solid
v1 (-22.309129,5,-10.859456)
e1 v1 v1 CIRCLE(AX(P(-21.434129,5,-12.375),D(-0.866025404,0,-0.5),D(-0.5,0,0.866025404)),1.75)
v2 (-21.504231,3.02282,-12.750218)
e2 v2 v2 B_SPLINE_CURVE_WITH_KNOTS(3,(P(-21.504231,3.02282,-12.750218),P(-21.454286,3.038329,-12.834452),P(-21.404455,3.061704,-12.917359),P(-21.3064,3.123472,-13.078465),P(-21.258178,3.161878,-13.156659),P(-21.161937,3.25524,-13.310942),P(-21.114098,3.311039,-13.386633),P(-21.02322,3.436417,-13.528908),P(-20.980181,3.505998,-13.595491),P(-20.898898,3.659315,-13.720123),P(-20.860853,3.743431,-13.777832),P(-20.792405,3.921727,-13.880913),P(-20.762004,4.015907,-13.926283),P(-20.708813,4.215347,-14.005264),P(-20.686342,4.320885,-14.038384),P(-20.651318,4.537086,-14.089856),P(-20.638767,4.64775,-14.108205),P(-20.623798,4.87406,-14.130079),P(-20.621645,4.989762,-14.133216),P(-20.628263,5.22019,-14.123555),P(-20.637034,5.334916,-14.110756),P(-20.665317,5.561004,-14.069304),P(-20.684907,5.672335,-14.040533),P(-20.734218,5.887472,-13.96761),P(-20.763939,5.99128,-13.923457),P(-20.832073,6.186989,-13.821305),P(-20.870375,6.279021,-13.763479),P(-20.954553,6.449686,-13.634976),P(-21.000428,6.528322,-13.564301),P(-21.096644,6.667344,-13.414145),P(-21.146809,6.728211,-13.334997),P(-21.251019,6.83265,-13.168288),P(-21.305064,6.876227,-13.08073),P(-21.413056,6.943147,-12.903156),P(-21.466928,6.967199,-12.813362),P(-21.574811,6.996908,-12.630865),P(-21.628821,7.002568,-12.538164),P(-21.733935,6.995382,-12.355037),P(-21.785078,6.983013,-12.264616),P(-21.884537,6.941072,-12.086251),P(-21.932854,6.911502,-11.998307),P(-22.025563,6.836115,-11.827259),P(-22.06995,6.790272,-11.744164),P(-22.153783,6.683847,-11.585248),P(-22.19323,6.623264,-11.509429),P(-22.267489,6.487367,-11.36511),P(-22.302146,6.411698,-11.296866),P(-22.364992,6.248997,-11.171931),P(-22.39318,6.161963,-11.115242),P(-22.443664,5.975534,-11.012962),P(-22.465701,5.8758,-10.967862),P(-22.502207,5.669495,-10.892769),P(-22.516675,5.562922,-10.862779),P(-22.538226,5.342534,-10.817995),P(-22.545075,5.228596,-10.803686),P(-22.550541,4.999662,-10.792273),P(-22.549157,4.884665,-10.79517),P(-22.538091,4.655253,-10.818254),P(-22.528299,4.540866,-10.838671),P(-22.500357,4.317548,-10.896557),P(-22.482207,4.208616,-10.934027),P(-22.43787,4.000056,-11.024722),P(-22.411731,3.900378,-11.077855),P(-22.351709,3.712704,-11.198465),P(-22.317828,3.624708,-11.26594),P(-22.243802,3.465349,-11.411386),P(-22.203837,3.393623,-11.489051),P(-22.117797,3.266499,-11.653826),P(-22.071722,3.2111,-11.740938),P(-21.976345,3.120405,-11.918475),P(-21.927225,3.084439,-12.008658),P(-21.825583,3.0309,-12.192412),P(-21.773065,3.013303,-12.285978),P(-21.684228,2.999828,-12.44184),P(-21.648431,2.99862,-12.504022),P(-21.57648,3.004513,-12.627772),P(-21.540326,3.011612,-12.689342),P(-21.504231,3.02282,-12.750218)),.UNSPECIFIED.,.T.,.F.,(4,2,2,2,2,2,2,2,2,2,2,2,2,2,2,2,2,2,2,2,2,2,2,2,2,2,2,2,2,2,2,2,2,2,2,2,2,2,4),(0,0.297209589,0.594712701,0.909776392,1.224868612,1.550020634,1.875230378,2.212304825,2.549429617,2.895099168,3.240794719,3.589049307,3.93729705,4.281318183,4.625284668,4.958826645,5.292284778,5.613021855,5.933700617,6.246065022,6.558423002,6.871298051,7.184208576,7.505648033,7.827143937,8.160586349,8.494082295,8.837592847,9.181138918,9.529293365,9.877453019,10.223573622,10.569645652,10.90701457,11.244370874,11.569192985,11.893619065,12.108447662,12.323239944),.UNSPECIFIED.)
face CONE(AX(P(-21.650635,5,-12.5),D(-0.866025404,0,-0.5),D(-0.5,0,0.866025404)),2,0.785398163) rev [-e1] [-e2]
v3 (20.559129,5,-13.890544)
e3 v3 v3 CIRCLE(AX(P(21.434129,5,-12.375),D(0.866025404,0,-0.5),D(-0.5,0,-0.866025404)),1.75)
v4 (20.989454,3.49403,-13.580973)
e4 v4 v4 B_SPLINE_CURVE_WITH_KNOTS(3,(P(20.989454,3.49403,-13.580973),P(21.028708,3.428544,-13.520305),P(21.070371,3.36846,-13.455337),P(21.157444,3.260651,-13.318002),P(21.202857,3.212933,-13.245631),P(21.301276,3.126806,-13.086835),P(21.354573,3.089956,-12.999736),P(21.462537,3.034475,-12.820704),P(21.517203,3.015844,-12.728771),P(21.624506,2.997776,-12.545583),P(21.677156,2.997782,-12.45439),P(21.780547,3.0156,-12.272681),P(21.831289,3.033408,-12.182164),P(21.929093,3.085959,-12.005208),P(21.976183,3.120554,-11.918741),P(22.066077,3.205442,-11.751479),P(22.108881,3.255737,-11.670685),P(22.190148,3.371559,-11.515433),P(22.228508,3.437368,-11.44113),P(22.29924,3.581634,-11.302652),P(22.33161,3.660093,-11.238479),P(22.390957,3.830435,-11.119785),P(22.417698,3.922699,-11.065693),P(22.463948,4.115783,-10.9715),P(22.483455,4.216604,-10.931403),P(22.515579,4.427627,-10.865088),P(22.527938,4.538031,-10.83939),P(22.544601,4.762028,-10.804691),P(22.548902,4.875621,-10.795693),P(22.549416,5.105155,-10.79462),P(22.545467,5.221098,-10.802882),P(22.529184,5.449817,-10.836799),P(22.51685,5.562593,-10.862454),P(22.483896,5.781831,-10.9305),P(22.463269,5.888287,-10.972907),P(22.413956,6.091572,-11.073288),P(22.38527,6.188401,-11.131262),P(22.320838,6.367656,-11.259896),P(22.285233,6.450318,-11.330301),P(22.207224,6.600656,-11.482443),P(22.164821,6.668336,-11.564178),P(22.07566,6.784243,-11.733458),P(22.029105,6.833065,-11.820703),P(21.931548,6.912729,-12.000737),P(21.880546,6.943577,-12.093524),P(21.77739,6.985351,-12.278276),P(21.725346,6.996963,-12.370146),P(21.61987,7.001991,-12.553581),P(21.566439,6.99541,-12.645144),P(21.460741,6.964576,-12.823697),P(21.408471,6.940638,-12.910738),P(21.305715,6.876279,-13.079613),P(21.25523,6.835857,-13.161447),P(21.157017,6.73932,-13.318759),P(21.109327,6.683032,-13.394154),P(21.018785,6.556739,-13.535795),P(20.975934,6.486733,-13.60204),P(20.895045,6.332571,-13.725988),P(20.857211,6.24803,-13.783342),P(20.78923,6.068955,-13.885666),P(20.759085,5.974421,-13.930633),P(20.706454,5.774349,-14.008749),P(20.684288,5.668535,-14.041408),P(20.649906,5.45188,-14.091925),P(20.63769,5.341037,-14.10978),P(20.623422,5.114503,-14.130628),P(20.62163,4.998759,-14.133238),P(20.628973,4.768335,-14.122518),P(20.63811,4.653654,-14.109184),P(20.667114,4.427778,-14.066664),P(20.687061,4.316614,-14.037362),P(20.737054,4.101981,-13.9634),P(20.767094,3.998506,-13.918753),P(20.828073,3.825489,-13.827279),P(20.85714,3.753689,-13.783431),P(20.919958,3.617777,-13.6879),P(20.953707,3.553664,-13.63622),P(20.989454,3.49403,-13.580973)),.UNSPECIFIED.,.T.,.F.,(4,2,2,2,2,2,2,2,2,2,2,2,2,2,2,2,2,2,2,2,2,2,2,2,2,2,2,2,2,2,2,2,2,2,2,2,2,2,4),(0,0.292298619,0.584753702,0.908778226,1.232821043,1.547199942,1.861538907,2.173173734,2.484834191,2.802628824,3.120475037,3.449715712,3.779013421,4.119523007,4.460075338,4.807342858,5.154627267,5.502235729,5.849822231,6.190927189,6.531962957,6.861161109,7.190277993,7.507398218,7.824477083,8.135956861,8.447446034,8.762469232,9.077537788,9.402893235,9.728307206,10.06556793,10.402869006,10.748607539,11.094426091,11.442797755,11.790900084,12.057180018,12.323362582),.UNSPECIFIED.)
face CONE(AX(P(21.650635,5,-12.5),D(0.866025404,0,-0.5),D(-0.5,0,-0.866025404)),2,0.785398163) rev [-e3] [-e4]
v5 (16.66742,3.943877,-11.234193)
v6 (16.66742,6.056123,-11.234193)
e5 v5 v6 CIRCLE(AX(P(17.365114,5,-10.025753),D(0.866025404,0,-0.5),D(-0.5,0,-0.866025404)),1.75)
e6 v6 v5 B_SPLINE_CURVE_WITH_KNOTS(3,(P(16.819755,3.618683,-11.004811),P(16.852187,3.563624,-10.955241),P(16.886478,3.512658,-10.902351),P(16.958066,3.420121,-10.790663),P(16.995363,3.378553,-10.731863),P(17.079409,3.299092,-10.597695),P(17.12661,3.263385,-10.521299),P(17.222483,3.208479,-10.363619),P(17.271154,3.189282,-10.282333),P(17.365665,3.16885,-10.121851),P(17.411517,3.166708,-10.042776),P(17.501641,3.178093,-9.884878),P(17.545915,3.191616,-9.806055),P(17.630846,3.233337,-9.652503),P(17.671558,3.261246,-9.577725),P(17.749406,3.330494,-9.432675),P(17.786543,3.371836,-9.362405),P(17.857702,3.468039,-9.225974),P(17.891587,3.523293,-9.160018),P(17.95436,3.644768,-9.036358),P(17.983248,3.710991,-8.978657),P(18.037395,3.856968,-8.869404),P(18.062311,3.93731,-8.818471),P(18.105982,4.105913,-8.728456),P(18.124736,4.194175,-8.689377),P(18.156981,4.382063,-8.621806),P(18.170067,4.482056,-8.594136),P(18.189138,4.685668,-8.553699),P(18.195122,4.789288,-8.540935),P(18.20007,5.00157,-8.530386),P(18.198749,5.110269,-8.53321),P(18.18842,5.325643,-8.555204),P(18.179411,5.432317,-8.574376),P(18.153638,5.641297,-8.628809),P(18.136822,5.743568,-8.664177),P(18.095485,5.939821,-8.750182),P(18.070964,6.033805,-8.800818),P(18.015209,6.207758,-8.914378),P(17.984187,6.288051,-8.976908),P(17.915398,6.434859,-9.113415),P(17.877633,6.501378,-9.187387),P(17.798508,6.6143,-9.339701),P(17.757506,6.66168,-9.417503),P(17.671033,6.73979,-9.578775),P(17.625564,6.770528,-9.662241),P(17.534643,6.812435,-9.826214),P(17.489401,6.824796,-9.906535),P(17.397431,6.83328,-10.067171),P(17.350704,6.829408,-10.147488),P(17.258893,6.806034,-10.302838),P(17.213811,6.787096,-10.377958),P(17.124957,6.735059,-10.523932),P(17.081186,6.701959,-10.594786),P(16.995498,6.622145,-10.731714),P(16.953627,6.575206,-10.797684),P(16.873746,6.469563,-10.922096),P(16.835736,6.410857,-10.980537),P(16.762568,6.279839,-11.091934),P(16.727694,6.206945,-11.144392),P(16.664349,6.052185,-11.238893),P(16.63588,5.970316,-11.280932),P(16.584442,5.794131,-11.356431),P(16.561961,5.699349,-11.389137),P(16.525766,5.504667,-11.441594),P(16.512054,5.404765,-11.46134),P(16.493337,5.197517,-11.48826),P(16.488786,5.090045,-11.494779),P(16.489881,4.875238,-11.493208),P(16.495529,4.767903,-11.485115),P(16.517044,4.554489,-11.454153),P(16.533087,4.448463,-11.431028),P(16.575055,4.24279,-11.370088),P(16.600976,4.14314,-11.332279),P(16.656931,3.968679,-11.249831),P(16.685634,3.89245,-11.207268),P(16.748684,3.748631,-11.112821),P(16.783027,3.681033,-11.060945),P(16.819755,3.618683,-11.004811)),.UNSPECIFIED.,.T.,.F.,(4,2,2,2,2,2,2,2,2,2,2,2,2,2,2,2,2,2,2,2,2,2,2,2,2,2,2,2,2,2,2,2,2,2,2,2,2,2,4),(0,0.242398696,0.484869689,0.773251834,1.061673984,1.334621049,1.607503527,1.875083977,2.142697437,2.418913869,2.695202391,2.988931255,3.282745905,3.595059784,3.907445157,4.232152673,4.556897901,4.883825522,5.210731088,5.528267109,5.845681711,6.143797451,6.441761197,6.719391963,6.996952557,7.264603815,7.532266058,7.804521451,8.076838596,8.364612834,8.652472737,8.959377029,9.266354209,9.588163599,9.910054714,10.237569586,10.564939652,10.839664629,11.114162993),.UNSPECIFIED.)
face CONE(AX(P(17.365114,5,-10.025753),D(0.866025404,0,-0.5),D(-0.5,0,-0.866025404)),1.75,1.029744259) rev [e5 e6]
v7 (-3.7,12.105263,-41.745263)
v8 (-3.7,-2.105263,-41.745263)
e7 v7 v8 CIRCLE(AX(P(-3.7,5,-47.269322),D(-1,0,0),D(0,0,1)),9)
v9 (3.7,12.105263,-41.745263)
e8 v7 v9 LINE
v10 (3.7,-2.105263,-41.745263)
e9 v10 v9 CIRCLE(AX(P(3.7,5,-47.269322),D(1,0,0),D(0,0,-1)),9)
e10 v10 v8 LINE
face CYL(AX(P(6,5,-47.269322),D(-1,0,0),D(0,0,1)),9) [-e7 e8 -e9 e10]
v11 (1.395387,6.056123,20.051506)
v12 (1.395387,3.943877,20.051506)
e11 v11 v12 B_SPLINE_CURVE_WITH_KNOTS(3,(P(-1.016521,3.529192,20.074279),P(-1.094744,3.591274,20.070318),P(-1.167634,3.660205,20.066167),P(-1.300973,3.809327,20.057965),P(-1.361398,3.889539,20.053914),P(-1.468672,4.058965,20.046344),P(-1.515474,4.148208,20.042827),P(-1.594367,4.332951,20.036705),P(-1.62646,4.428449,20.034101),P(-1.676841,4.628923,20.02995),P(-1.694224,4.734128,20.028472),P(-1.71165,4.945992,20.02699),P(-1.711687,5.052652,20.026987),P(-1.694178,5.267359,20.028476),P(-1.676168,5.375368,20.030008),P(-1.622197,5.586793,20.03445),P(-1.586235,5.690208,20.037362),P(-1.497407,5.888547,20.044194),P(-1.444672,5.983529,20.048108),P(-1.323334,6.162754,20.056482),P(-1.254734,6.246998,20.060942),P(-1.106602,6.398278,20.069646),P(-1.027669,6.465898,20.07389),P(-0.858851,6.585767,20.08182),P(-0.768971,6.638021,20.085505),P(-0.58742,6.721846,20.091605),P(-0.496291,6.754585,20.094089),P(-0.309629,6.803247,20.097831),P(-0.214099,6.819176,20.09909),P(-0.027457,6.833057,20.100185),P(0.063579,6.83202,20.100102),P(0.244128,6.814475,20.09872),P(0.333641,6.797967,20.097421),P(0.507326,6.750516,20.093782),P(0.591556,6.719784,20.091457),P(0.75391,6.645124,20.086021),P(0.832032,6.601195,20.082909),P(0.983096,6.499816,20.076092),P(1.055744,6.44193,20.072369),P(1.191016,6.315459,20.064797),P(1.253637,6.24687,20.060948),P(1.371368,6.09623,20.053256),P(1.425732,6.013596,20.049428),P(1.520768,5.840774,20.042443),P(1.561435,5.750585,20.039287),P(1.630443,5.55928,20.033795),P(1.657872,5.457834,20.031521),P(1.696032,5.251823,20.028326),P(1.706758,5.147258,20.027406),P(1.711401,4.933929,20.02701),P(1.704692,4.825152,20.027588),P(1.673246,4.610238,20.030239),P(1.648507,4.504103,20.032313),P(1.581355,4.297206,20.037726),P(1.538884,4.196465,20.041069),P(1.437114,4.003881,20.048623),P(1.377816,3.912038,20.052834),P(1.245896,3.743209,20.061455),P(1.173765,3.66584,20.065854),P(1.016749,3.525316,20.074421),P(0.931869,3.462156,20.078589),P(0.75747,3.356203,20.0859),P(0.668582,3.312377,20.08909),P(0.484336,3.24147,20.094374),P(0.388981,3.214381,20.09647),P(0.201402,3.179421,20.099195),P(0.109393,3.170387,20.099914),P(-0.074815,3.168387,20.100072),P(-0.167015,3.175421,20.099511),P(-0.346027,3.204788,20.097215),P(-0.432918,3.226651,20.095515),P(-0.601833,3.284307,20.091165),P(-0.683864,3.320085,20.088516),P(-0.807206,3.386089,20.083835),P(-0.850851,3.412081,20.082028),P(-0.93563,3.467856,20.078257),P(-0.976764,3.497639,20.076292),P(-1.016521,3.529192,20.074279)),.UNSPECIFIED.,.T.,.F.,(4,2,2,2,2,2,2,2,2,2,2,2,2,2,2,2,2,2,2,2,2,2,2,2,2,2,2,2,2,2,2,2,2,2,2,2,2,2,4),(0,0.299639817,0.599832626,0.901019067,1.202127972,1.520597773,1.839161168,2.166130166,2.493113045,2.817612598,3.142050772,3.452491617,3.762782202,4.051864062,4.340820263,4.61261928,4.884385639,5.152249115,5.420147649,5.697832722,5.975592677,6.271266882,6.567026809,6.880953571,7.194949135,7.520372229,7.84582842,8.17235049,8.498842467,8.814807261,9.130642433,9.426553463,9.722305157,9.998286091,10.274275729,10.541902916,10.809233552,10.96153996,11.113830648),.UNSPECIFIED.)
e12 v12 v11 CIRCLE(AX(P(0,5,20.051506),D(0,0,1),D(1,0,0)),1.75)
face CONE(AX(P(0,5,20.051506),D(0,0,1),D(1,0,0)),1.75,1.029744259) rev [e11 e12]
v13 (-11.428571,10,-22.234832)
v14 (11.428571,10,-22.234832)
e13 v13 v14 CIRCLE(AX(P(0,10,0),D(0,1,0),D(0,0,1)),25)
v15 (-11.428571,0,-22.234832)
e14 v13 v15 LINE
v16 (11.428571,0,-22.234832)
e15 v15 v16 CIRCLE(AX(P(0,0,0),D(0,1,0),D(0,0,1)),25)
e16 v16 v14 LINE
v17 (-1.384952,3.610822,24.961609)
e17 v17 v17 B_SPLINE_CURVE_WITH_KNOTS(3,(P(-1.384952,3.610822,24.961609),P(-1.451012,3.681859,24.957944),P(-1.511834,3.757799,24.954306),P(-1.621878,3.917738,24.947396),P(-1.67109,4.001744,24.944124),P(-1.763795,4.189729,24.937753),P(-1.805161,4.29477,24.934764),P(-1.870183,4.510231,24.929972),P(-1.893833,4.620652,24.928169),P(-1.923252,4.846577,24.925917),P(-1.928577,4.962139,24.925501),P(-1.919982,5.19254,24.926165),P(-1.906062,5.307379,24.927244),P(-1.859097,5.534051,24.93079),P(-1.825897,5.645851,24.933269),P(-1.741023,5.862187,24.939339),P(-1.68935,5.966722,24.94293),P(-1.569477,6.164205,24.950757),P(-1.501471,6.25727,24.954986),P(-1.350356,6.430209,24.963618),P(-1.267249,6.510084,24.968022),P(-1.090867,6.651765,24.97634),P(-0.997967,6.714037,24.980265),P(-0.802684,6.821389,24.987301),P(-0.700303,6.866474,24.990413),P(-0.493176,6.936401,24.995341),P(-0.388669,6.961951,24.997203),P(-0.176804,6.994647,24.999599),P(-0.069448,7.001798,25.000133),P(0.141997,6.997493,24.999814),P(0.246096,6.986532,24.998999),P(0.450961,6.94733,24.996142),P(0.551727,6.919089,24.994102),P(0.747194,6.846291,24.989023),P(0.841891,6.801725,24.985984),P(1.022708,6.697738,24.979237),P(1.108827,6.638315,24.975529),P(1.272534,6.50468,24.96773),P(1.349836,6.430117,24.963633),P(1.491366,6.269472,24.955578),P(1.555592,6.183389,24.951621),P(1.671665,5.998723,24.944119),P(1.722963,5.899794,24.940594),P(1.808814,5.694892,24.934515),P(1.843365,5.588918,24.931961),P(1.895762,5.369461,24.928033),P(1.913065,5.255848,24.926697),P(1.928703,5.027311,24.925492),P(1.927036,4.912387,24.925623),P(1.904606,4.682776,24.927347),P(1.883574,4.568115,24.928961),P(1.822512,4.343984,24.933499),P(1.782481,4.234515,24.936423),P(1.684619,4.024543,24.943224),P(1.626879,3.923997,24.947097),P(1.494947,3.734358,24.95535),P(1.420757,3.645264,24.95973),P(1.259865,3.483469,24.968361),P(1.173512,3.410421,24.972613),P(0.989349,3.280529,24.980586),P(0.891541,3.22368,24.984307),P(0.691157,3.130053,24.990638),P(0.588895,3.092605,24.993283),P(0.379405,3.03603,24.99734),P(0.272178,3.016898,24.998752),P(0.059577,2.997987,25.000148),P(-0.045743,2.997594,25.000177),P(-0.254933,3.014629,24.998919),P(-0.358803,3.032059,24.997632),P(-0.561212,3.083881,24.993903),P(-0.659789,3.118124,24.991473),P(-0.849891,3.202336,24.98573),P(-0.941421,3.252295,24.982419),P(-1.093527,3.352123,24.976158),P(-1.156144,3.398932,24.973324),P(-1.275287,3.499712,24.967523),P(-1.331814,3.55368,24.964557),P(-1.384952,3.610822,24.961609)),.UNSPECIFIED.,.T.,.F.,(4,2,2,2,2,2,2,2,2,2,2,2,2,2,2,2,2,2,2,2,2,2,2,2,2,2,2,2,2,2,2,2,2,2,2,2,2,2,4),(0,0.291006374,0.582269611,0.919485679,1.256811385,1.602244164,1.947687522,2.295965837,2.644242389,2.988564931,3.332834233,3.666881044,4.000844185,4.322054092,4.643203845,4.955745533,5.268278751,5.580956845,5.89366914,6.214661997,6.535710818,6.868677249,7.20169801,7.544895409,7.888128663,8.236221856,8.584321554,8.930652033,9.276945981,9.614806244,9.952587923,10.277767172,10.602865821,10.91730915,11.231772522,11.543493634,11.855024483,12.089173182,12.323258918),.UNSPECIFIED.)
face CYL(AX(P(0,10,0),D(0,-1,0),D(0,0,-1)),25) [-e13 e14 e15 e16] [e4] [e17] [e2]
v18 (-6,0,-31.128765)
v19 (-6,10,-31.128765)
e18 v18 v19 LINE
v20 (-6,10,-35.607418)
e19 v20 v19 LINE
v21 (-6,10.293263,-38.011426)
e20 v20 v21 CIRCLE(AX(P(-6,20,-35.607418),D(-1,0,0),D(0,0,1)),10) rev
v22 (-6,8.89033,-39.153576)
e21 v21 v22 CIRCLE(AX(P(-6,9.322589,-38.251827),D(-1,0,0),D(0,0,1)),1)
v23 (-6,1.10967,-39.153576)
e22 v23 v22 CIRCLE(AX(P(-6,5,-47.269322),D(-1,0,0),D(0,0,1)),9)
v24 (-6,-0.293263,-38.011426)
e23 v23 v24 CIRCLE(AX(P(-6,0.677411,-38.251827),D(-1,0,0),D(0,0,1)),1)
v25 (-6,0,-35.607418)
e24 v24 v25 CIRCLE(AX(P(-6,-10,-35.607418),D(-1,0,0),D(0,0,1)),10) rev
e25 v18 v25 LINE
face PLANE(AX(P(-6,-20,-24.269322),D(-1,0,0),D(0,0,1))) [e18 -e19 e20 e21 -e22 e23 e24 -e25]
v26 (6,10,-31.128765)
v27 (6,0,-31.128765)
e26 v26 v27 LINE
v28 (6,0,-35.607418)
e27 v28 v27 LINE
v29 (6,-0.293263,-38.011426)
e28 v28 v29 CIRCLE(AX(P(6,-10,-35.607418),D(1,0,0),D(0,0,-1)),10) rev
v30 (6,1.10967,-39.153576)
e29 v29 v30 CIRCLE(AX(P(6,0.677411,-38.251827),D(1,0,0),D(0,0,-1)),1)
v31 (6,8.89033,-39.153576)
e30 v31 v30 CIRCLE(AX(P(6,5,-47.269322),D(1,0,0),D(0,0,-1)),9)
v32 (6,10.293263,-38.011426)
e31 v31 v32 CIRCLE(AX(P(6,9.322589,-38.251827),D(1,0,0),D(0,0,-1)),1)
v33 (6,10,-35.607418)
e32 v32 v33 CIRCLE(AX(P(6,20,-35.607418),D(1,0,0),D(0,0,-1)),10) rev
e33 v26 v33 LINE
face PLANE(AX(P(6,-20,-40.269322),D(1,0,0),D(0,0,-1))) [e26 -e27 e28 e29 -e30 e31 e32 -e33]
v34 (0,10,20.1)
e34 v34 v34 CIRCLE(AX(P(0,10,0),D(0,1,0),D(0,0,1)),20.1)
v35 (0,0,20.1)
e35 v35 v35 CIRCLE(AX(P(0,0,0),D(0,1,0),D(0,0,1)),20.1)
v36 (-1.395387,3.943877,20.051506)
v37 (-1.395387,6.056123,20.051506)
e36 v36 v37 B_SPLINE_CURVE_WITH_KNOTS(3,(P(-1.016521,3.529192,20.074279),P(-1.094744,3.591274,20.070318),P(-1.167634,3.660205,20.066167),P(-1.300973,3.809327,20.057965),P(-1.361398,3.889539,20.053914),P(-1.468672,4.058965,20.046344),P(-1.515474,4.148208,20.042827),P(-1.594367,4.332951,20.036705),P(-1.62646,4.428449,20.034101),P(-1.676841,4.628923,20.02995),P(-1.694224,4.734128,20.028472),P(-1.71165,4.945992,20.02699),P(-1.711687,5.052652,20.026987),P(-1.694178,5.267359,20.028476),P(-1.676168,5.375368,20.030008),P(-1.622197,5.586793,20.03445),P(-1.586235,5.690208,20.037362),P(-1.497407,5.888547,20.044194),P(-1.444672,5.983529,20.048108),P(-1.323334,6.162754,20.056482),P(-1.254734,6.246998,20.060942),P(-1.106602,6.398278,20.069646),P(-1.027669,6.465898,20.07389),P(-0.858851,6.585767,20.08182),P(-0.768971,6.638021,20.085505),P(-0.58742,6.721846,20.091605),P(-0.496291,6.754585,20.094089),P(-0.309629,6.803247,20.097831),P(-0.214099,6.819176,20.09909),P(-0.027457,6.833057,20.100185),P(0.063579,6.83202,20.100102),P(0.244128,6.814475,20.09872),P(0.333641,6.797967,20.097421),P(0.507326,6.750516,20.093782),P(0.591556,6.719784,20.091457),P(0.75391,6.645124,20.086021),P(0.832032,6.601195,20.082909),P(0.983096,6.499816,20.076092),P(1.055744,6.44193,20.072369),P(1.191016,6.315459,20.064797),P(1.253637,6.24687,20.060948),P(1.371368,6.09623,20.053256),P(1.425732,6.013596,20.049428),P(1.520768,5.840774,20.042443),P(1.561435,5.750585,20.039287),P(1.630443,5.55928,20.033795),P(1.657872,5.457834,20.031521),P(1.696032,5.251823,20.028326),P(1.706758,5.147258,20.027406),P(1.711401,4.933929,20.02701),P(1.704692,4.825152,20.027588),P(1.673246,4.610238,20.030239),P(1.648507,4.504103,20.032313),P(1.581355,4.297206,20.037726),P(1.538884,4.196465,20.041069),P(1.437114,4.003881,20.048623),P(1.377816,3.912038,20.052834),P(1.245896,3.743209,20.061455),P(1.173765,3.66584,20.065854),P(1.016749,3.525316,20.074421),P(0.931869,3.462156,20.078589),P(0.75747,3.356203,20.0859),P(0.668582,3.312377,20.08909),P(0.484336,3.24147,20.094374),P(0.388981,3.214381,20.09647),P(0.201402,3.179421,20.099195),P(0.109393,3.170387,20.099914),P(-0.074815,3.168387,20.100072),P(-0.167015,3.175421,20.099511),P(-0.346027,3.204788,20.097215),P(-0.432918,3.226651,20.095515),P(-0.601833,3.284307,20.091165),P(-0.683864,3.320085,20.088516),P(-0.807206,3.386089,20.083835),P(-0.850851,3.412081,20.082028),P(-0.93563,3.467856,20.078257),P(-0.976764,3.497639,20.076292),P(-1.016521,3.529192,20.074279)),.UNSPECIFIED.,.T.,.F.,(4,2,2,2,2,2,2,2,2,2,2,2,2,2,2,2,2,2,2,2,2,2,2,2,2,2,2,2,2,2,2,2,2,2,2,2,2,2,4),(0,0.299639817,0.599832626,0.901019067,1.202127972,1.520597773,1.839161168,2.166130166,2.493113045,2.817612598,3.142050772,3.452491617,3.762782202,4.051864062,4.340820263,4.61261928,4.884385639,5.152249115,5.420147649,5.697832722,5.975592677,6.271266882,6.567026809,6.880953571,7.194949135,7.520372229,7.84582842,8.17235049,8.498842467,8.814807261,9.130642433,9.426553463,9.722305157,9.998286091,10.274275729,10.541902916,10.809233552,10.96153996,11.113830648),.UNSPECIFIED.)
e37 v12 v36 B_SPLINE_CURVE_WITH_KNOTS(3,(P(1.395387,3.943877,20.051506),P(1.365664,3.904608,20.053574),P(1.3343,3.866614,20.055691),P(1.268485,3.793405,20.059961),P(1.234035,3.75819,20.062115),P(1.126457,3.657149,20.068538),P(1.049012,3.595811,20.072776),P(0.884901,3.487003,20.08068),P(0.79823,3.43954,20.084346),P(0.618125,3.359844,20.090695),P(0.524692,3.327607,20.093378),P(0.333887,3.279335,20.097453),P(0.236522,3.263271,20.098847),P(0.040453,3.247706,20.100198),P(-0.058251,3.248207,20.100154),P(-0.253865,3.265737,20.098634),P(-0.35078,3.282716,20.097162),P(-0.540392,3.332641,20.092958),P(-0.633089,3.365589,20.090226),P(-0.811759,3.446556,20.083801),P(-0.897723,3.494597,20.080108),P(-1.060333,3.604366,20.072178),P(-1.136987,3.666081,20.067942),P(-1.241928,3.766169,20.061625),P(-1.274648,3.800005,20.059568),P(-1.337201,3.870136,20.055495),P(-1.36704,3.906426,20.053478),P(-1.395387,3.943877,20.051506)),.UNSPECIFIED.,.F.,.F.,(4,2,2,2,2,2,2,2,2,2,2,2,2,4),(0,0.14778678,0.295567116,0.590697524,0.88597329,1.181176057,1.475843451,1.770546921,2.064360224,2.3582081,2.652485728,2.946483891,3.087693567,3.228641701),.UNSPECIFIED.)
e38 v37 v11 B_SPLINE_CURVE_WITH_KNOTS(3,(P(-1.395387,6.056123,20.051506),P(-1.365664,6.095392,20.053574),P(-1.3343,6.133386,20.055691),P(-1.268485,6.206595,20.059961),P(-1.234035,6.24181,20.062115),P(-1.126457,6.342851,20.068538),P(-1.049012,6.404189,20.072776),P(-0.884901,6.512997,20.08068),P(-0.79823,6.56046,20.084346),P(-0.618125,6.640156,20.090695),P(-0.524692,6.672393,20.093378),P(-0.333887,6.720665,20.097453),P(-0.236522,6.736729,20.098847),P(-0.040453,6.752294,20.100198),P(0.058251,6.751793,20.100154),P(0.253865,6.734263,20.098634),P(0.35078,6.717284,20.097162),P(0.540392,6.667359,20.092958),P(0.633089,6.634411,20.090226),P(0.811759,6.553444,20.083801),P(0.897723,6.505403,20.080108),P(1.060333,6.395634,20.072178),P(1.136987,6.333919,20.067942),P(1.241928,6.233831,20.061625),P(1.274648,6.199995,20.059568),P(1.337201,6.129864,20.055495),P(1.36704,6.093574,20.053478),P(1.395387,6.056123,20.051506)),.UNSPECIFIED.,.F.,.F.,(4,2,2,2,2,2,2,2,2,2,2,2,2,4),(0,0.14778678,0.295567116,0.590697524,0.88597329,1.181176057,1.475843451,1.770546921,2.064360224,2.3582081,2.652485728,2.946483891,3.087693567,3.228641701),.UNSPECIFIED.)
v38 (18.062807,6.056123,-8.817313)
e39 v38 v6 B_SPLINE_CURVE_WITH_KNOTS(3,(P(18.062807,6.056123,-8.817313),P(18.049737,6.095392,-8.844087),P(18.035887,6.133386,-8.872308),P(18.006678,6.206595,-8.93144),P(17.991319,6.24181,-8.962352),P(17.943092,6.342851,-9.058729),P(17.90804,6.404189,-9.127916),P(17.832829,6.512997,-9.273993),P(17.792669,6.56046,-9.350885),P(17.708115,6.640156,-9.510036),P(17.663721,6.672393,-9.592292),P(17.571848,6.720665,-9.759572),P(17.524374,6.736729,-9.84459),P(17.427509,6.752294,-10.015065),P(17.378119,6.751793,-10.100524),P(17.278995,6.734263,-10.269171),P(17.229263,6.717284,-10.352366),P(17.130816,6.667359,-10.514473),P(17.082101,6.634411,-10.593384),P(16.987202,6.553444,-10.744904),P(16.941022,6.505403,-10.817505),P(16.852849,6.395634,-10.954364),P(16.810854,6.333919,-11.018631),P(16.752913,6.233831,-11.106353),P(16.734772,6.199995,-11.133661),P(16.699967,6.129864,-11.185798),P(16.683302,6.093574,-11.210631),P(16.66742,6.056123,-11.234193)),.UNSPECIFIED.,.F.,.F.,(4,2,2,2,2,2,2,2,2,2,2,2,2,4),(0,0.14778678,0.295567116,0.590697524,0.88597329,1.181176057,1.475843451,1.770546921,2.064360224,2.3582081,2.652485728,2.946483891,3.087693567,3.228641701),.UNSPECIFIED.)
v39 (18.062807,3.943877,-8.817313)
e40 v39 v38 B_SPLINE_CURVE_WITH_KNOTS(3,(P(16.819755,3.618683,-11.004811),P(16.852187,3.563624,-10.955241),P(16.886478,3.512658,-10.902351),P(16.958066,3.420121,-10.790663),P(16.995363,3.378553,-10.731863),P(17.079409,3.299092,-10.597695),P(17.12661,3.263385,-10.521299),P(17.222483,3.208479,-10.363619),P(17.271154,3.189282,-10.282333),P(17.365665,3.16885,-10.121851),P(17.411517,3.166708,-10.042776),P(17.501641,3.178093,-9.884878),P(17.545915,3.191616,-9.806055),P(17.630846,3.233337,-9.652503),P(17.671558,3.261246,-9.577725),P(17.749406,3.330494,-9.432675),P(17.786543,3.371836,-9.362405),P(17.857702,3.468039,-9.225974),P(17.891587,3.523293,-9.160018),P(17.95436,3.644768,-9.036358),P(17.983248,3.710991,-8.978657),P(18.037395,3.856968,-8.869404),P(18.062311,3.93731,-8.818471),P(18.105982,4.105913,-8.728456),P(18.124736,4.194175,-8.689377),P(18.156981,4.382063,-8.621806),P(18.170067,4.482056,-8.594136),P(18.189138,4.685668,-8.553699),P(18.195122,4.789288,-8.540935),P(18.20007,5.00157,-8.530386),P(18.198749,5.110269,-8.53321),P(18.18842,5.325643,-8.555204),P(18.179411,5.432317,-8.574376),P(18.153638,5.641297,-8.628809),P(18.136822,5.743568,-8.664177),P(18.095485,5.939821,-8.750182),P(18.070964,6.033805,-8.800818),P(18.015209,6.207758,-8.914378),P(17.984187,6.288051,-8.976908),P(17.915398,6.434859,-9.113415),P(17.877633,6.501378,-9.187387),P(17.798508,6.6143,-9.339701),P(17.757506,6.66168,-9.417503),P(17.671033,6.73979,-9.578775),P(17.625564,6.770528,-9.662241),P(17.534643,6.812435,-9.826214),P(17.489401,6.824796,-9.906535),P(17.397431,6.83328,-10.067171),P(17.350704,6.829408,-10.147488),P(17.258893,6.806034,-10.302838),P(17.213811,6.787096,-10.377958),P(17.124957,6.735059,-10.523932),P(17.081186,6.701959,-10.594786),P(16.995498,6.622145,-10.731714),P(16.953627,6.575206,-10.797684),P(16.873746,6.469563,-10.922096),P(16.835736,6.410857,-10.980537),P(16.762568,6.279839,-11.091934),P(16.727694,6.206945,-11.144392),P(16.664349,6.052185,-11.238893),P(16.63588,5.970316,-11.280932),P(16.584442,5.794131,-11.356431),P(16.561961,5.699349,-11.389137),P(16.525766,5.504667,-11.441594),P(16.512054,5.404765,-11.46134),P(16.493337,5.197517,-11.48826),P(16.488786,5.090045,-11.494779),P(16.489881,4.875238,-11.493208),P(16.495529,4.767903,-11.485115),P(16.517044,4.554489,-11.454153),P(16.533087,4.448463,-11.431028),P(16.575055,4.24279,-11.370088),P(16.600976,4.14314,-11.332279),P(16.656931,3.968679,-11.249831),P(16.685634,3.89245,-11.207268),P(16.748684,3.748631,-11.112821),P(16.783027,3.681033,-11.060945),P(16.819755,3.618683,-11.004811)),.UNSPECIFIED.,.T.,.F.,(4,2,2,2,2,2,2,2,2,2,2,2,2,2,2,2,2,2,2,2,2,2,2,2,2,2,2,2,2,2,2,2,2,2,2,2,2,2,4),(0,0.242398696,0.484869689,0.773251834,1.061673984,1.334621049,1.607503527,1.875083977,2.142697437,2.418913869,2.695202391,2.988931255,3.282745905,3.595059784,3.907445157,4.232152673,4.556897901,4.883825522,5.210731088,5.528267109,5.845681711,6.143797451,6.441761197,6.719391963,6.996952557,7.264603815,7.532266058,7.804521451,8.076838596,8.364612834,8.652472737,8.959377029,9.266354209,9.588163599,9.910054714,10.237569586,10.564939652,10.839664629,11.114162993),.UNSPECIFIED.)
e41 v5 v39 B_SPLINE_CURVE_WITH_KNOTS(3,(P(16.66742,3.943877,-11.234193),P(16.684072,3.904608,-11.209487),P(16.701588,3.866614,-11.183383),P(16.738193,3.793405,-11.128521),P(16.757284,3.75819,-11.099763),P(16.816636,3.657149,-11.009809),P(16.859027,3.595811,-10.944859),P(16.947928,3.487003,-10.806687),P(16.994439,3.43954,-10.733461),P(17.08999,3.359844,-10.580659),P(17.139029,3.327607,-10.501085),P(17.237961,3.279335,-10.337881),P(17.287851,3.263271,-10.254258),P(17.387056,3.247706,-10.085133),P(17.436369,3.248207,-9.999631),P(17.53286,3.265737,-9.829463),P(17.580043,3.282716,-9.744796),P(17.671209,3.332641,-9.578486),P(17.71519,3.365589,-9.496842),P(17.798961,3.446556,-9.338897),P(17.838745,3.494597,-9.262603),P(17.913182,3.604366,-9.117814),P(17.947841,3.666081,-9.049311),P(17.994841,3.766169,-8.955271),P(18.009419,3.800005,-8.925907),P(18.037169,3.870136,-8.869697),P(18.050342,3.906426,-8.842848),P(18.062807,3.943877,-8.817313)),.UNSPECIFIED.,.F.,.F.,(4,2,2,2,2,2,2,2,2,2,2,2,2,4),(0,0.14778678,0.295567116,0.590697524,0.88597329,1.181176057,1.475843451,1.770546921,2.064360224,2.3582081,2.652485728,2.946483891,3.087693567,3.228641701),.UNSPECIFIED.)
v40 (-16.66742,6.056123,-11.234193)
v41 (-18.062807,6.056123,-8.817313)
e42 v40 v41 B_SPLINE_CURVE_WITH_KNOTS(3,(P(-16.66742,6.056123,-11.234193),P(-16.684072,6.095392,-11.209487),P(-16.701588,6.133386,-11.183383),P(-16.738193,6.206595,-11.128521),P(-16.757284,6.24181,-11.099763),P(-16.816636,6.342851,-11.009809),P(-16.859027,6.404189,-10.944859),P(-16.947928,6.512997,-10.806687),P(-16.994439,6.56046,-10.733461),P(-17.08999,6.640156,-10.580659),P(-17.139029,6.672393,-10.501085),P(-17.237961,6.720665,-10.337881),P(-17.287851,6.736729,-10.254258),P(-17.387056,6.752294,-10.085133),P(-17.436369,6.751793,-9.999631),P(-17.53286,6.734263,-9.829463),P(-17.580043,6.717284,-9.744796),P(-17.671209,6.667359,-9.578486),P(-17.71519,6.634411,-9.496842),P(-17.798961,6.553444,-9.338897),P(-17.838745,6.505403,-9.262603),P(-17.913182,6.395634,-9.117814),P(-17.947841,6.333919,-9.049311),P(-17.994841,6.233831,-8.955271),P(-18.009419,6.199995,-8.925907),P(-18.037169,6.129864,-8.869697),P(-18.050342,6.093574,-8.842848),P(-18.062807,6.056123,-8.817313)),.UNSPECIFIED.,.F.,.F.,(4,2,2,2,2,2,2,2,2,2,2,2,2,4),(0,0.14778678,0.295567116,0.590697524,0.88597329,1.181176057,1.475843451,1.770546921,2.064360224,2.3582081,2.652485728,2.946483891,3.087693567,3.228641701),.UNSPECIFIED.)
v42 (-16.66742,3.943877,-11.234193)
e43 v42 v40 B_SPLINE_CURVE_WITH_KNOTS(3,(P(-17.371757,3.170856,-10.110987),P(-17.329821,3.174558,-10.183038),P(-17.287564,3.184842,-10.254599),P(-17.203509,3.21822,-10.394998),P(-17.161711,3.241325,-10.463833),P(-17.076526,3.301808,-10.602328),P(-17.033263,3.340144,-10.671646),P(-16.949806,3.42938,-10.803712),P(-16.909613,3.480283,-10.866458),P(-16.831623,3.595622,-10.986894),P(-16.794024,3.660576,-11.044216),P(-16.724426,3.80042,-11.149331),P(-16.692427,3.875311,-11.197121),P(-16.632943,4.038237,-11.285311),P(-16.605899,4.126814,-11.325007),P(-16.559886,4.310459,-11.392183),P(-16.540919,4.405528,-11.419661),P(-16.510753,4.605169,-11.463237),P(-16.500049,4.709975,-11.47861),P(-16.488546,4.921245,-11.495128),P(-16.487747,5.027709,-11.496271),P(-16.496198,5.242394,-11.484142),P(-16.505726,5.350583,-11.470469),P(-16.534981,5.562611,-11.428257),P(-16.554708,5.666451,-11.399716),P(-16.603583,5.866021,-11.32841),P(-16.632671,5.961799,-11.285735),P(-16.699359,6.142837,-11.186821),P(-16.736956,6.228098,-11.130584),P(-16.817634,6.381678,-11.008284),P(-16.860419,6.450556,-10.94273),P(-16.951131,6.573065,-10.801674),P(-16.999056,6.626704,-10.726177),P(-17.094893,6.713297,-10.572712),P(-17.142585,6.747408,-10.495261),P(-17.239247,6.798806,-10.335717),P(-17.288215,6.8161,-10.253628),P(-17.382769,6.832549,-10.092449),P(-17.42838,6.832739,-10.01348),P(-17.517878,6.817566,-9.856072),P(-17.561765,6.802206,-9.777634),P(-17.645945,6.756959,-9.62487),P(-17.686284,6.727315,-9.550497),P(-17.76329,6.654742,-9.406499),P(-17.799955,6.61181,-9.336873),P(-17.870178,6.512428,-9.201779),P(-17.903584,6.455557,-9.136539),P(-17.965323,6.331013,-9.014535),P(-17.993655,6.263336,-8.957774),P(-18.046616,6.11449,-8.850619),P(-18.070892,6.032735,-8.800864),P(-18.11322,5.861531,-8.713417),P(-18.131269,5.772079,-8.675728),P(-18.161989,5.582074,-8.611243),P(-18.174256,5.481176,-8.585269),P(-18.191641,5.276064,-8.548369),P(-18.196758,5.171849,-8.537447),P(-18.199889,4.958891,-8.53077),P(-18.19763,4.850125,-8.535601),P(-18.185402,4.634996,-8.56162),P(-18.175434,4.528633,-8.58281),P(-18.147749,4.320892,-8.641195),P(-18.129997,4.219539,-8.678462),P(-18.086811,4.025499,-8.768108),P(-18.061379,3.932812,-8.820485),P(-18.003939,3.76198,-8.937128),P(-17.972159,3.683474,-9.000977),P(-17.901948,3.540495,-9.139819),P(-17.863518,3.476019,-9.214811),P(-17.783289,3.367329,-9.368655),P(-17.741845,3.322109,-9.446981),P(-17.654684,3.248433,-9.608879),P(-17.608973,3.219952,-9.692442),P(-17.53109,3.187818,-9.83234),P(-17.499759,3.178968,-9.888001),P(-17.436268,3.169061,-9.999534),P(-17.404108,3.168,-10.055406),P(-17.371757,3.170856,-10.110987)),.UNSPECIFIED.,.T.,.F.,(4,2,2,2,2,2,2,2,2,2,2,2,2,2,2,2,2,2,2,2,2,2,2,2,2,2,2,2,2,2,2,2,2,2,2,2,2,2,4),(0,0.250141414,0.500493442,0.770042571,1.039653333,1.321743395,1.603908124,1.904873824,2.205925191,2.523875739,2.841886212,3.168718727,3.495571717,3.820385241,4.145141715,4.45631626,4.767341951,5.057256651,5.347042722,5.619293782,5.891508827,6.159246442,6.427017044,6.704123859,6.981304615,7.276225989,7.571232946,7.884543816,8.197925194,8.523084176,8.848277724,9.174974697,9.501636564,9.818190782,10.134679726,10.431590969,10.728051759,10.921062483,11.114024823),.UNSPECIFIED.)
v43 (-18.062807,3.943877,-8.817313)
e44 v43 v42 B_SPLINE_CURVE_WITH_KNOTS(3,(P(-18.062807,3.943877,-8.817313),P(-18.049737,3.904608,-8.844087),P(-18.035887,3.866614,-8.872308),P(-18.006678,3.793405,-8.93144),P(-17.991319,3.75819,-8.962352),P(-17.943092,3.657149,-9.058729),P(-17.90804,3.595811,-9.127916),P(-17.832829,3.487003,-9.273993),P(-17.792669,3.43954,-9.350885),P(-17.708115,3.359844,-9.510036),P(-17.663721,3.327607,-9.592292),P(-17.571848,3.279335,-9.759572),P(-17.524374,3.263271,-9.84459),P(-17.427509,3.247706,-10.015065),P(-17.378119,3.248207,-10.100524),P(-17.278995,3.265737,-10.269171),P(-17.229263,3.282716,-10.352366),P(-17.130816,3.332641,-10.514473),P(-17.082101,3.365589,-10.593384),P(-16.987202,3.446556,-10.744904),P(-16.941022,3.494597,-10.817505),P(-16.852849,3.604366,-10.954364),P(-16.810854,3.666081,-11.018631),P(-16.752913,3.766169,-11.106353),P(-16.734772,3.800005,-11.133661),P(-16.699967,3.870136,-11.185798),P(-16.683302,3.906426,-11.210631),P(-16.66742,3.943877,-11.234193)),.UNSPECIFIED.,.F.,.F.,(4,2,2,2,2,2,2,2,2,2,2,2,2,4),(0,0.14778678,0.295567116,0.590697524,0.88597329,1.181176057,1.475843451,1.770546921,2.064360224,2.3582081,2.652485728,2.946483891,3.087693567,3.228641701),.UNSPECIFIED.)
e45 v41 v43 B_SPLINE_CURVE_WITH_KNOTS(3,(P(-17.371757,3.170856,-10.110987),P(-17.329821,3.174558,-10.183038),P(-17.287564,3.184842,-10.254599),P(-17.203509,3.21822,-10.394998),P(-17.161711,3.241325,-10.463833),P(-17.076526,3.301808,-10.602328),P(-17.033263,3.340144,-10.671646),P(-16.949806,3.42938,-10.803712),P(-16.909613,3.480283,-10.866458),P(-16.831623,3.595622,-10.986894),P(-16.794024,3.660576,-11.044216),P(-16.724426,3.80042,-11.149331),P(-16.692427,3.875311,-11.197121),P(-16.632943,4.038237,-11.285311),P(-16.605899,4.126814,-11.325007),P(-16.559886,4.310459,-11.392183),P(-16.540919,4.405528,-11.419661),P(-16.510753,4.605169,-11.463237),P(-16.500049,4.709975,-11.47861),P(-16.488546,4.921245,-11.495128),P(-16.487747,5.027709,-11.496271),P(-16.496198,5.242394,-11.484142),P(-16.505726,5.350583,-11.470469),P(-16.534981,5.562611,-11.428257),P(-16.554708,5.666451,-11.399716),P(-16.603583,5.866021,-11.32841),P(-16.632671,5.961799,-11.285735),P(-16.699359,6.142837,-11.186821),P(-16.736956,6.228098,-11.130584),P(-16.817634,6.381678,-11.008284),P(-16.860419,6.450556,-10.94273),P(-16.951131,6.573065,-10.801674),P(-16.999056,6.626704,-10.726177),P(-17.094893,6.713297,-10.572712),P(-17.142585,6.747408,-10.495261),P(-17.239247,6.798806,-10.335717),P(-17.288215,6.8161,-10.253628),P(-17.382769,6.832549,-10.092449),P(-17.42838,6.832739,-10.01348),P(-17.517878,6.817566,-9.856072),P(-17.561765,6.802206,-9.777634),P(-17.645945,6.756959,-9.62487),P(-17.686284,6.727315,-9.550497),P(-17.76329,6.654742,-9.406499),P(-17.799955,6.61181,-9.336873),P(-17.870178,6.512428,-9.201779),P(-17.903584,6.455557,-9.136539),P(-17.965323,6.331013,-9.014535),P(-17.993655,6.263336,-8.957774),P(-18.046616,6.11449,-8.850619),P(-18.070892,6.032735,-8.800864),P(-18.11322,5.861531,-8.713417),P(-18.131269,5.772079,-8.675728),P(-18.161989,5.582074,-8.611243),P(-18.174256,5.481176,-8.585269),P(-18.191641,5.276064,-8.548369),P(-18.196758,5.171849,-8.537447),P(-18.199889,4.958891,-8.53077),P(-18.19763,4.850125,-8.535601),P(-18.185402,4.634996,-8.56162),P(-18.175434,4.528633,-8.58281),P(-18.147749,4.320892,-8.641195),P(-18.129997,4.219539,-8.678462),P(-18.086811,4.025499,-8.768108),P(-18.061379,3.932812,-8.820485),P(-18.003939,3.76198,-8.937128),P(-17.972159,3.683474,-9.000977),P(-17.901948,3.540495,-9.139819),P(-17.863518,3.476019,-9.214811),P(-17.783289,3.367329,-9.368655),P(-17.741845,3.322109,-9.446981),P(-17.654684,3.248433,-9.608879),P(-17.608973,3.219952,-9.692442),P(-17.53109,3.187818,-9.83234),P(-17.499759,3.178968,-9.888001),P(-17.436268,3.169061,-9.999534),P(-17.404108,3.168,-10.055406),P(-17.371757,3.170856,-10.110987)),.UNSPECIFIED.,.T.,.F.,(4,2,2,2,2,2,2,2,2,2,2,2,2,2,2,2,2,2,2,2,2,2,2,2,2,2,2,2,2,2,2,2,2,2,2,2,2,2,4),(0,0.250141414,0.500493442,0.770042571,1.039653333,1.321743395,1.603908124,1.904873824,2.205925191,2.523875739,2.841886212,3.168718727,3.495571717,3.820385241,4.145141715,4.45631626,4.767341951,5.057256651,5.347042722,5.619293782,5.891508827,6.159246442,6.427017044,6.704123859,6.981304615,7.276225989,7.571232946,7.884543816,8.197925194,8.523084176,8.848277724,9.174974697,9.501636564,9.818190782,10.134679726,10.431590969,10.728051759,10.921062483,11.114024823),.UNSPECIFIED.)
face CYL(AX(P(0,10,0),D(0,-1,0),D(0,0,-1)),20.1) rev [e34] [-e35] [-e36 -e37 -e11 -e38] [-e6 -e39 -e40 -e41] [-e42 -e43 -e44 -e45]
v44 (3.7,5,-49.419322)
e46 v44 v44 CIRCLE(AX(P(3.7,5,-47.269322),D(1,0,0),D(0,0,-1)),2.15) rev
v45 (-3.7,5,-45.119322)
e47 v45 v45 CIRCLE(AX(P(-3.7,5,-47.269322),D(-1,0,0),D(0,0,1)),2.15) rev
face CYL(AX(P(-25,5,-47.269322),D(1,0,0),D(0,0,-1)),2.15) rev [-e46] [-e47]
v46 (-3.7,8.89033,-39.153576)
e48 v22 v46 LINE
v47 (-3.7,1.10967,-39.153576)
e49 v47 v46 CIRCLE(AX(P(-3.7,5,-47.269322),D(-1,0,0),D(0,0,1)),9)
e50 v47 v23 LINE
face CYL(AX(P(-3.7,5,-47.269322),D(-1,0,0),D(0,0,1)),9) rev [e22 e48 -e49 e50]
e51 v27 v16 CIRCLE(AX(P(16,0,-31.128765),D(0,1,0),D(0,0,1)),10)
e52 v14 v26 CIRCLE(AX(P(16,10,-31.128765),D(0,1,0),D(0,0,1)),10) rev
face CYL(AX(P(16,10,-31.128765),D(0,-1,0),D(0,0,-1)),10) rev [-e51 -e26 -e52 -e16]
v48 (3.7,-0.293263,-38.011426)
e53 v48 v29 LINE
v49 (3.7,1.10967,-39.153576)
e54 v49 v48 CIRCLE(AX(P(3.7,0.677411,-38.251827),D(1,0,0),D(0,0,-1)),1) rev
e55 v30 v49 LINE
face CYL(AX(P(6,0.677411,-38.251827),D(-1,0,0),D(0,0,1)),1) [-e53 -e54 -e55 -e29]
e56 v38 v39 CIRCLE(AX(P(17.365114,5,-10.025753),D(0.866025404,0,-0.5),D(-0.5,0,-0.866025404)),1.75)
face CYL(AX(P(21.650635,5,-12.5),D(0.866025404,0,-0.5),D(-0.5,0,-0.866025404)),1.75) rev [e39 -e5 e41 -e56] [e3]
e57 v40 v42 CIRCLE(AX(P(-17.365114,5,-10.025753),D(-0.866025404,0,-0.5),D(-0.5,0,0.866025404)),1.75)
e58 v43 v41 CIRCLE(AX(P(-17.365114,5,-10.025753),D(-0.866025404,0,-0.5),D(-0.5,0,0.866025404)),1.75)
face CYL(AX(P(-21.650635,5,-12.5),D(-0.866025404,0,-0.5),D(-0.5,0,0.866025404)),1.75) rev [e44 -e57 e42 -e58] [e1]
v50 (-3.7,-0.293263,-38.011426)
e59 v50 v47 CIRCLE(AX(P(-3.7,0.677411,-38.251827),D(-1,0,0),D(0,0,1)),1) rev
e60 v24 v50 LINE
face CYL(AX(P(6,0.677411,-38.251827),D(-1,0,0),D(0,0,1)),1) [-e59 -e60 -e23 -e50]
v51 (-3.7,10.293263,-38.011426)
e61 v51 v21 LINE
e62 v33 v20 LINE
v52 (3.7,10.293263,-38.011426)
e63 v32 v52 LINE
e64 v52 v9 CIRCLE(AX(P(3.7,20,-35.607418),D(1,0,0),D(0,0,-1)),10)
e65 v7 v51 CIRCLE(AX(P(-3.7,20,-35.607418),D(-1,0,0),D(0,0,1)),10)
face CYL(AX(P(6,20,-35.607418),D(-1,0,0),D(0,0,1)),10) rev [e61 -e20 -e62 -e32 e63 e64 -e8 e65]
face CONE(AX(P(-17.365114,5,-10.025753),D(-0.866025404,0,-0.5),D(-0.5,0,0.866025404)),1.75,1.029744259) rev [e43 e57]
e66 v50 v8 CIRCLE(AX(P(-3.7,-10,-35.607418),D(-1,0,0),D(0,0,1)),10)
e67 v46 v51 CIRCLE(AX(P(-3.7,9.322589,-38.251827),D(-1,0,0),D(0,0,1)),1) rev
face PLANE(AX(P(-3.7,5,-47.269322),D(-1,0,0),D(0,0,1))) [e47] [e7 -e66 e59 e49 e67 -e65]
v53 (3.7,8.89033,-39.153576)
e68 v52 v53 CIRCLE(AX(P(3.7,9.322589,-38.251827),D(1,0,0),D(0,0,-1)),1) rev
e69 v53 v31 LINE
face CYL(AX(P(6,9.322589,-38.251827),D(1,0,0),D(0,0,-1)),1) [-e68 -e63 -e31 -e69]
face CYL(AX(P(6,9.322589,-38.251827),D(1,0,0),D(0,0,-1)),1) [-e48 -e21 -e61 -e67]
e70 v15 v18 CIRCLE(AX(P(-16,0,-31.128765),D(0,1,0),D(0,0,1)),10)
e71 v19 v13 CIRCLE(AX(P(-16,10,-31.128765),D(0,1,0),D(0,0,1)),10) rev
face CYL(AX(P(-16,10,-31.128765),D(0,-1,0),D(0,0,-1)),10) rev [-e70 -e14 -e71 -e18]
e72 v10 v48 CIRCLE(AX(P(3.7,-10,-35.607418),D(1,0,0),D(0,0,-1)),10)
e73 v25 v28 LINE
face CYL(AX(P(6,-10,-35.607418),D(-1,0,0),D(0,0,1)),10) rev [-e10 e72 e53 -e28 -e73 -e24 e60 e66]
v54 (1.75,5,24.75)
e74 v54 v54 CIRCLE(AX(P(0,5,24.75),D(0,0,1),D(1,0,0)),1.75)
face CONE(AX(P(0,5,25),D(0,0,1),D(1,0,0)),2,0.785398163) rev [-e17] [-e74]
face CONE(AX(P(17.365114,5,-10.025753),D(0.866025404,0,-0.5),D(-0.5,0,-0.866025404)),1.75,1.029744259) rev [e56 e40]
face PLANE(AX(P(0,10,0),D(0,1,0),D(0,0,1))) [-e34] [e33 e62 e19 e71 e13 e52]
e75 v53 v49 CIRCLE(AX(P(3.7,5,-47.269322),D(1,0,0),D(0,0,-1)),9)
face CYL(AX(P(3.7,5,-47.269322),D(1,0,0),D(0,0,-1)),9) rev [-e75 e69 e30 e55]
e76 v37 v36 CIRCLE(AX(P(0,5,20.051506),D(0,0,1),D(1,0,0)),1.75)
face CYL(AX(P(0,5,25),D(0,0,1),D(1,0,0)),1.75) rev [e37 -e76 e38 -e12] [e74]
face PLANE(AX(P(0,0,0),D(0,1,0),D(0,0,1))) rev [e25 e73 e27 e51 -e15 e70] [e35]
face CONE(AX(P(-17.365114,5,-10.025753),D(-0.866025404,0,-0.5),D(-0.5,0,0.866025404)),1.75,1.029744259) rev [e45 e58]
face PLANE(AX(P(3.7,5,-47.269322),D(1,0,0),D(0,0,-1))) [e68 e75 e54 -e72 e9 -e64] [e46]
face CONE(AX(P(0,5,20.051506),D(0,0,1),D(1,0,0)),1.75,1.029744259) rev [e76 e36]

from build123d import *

# Parameters (mm, degrees)
SKETCH_1_R                      = 25
SKETCH_1_R_2                    = 20.1
EXTRUDE_1_DEPTH                 = 10
EXTRUDE_START                   = -10
EXTRUDE_2_DEPTH                 = 10
SKETCH_3_R                      = 9
EXTRUDE_3_DEPTH                 = 6
SKETCH_4_R                      = 2.15
CUT_EXTRUDE_1_DEPTH             = 66.751324099
FILLET_1_R                      = 10
SKETCH_5_R                      = 9
CUT_EXTRUDE_2_DEPTH             = 2.3
CUT_EXTRUDE_START               = -2.3
SKETCH_6_R                      = 9
CUT_EXTRUDE_3_DEPTH             = 2.3
FILLET_START                    = -6
FILLET_2_DEPTH                  = 2.3
FILLET_START_2                  = 3.7
FILLET_2_2_DEPTH                = 2.3
F_3_0MM_1_D                     = 3.5
F_3_0MM_1_DEPTH                 = 4.948493917
F_3_0MM_1_CSINK_D               = 4
F_3_0MM_1_CSINK_ANGLE           = 90
F_3_0MM_1_TIP                   = 1.051506083
F_3_0MM_1_ON_FACE_2_D           = 3.5
F_3_0MM_1_ON_FACE_2_DEPTH       = 4.948493917
F_3_0MM_1_ON_FACE_2_CSINK_D     = 4
F_3_0MM_1_ON_FACE_2_CSINK_ANGLE = 90
F_3_0MM_1_ON_FACE_2_TIP         = 1.051506083
F_3_0MM_1_ON_FACE_3_D           = 3.5
F_3_0MM_1_ON_FACE_3_DEPTH       = 4.948493917
F_3_0MM_1_ON_FACE_3_CSINK_D     = 4
F_3_0MM_1_ON_FACE_3_CSINK_ANGLE = 90
F_3_0MM_1_ON_FACE_3_TIP         = 1.051506083


with BuildPart() as part:
    # 草图1 → 凸台-拉伸1 (new body)
    with BuildSketch(Plane(origin=(0, 0, 0), x_dir=(1, 0, 0), z_dir=(0, 1, 0))):
        with Locations(Location((0, 0, 0), (0, 0, 270))):
            Circle(SKETCH_1_R)
        with Locations(Location((0, 0, 0), (0, 0, 270))):
            Circle(SKETCH_1_R_2, mode=Mode.SUBTRACT)
    extrude(amount=EXTRUDE_1_DEPTH)

    # 草图2 → 凸台-拉伸2 (add)
    with BuildSketch(Plane(origin=(0, 10, 0), x_dir=(1, 0, 0), z_dir=(0, 1, 0)).offset(EXTRUDE_START)):
        with BuildLine():
            Line((-6, 24.269322199), (-6, 40.269322199))
            Line((-6, 40.269322199), (6, 40.269322199))
            Line((6, 40.269322199), (6, 24.269322199))
            ThreePointArc((6, 24.269322199), (0, 25), (-6, 24.269322199))
        make_face()
    extrude(amount=EXTRUDE_2_DEPTH)

    # 草图3 → 凸台-拉伸3 (add, symmetric)
    with BuildSketch(Plane(origin=(0, 0, 0), x_dir=(0, 0, -1), z_dir=(1, 0, 0))):
        with Locations((47.269322199, 5)):
            Circle(SKETCH_3_R)
    extrude(amount=EXTRUDE_3_DEPTH, both=True)

    # 草图4 → 切除-拉伸1 (cut, through all)
    with BuildSketch(Plane(origin=(6, 0, 0), x_dir=(0, 0, -1), z_dir=(1, 0, 0))):
        with Locations((47.269322199, 5)):
            Circle(SKETCH_4_R)
    extrude(amount=-CUT_EXTRUDE_1_DEPTH, mode=Mode.SUBTRACT)

    # 圆角1
    fillet_1_edges = [part.edges().sort_by_distance(p)[0] for p in [
        (6, 5, -24.269322199),
        (-6, 5, -24.269322199),
        (0, 10, -39.786007425),
        (0, 0, -39.786007425),
    ]]
    fillet(fillet_1_edges, radius=FILLET_1_R)

    # 草图5 → 切除-拉伸2 (cut)
    with BuildSketch(Plane(origin=(6, 0, 0), x_dir=(0, 0, -1), z_dir=(1, 0, 0))):
        with Locations((47.269322199, 5)):
            Circle(SKETCH_5_R)
    extrude(amount=-CUT_EXTRUDE_2_DEPTH, mode=Mode.SUBTRACT)

    # 草图6 → 切除-拉伸3 (cut)
    with BuildSketch(Plane.ZY.offset(6).offset(CUT_EXTRUDE_START)):
        with Locations((-47.269322199, 5)):
            Circle(SKETCH_6_R)
    extrude(amount=CUT_EXTRUDE_3_DEPTH, mode=Mode.SUBTRACT)

    # 圆角2: read off the stored shape, not the designer's step
    # 圆角2 outline → 圆角2 (cut)
    with BuildSketch(Plane.YZ.offset(FILLET_START)):
        with BuildLine():
            ThreePointArc((10.29326278, -38.011426009), (9.953936392, -39.027326957), (8.890330152, -39.153576312))
            ThreePointArc((8.890330152, -39.153576312), (10.648449114, -40.262538157), (12.105263158, -41.745262509))
            ThreePointArc((12.105263158, -41.745262509), (11.003425316, -39.973382673), (10.29326278, -38.011426009))
        make_face()
        with BuildLine():
            ThreePointArc((-2.105263158, -41.745262509), (-0.648449114, -40.262538157), (1.109669848, -39.153576312))
            ThreePointArc((1.109669848, -39.153576312), (0.046063608, -39.027326957), (-0.29326278, -38.011426009))
            ThreePointArc((-0.29326278, -38.011426009), (-1.003425316, -39.973382673), (-2.105263158, -41.745262509))
        make_face()
    extrude(amount=FILLET_2_DEPTH, mode=Mode.SUBTRACT)

    # Fillet 2 2 outline → Fillet 2 2 (cut)
    with BuildSketch(Plane.YZ.offset(FILLET_START_2)):
        with BuildLine():
            ThreePointArc((10.29326278, -38.011426009), (9.953936392, -39.027326957), (8.890330152, -39.153576312))
            ThreePointArc((8.890330152, -39.153576312), (10.648449114, -40.262538157), (12.105263158, -41.745262509))
            ThreePointArc((12.105263158, -41.745262509), (11.003425316, -39.973382673), (10.29326278, -38.011426009))
        make_face()
        with BuildLine():
            ThreePointArc((-2.105263158, -41.745262509), (-0.648449114, -40.262538157), (1.109669848, -39.153576312))
            ThreePointArc((1.109669848, -39.153576312), (0.046063608, -39.027326957), (-0.29326278, -38.011426009))
            ThreePointArc((-0.29326278, -38.011426009), (-1.003425316, -39.973382673), (-2.105263158, -41.745262509))
        make_face()
    extrude(amount=FILLET_2_2_DEPTH, mode=Mode.SUBTRACT)

    # Ø3.0mm 暗销孔1
    with Locations(Plane(origin=(0, 5, 25), x_dir=(1, 0, 0), z_dir=(0, 0, 1))):
        with Locations((0, 0)):
            CounterSinkHole(F_3_0MM_1_D / 2, F_3_0MM_1_CSINK_D / 2, depth=F_3_0MM_1_DEPTH, counter_sink_angle=F_3_0MM_1_CSINK_ANGLE)
            with Locations((0, 0, -(F_3_0MM_1_DEPTH + F_3_0MM_1_TIP / 2))):  # 118° drill point
                Cone(0, F_3_0MM_1_D / 2, F_3_0MM_1_TIP, mode=Mode.SUBTRACT)

    # Ø3.0mm 暗销孔1 on face 2
    with Locations(Plane(origin=(-21.650635095, 5, -12.5), x_dir=(0.500000174844, 0, -0.866025302838), z_dir=(-0.866025302838, 0, -0.500000174844))):
        with Locations((0, 0)):
            CounterSinkHole(F_3_0MM_1_ON_FACE_2_D / 2, F_3_0MM_1_ON_FACE_2_CSINK_D / 2, depth=F_3_0MM_1_ON_FACE_2_DEPTH, counter_sink_angle=F_3_0MM_1_ON_FACE_2_CSINK_ANGLE)
            with Locations((0, 0, -(F_3_0MM_1_ON_FACE_2_DEPTH + F_3_0MM_1_ON_FACE_2_TIP / 2))):  # 118° drill point
                Cone(0, F_3_0MM_1_ON_FACE_2_D / 2, F_3_0MM_1_ON_FACE_2_TIP, mode=Mode.SUBTRACT)

    # Ø3.0mm 暗销孔1 on face 3
    with Locations(Plane(origin=(21.650635095, 5, -12.5), x_dir=(0.500000174844, 0, 0.866025302838), z_dir=(0.866025302838, 0, -0.500000174844))):
        with Locations((0, 0)):
            CounterSinkHole(F_3_0MM_1_ON_FACE_3_D / 2, F_3_0MM_1_ON_FACE_3_CSINK_D / 2, depth=F_3_0MM_1_ON_FACE_3_DEPTH, counter_sink_angle=F_3_0MM_1_ON_FACE_3_CSINK_ANGLE)
            with Locations((0, 0, -(F_3_0MM_1_ON_FACE_3_DEPTH + F_3_0MM_1_ON_FACE_3_TIP / 2))):  # 118° drill point
                Cone(0, F_3_0MM_1_ON_FACE_3_D / 2, F_3_0MM_1_ON_FACE_3_TIP, mode=Mode.SUBTRACT)


solid = part.part
